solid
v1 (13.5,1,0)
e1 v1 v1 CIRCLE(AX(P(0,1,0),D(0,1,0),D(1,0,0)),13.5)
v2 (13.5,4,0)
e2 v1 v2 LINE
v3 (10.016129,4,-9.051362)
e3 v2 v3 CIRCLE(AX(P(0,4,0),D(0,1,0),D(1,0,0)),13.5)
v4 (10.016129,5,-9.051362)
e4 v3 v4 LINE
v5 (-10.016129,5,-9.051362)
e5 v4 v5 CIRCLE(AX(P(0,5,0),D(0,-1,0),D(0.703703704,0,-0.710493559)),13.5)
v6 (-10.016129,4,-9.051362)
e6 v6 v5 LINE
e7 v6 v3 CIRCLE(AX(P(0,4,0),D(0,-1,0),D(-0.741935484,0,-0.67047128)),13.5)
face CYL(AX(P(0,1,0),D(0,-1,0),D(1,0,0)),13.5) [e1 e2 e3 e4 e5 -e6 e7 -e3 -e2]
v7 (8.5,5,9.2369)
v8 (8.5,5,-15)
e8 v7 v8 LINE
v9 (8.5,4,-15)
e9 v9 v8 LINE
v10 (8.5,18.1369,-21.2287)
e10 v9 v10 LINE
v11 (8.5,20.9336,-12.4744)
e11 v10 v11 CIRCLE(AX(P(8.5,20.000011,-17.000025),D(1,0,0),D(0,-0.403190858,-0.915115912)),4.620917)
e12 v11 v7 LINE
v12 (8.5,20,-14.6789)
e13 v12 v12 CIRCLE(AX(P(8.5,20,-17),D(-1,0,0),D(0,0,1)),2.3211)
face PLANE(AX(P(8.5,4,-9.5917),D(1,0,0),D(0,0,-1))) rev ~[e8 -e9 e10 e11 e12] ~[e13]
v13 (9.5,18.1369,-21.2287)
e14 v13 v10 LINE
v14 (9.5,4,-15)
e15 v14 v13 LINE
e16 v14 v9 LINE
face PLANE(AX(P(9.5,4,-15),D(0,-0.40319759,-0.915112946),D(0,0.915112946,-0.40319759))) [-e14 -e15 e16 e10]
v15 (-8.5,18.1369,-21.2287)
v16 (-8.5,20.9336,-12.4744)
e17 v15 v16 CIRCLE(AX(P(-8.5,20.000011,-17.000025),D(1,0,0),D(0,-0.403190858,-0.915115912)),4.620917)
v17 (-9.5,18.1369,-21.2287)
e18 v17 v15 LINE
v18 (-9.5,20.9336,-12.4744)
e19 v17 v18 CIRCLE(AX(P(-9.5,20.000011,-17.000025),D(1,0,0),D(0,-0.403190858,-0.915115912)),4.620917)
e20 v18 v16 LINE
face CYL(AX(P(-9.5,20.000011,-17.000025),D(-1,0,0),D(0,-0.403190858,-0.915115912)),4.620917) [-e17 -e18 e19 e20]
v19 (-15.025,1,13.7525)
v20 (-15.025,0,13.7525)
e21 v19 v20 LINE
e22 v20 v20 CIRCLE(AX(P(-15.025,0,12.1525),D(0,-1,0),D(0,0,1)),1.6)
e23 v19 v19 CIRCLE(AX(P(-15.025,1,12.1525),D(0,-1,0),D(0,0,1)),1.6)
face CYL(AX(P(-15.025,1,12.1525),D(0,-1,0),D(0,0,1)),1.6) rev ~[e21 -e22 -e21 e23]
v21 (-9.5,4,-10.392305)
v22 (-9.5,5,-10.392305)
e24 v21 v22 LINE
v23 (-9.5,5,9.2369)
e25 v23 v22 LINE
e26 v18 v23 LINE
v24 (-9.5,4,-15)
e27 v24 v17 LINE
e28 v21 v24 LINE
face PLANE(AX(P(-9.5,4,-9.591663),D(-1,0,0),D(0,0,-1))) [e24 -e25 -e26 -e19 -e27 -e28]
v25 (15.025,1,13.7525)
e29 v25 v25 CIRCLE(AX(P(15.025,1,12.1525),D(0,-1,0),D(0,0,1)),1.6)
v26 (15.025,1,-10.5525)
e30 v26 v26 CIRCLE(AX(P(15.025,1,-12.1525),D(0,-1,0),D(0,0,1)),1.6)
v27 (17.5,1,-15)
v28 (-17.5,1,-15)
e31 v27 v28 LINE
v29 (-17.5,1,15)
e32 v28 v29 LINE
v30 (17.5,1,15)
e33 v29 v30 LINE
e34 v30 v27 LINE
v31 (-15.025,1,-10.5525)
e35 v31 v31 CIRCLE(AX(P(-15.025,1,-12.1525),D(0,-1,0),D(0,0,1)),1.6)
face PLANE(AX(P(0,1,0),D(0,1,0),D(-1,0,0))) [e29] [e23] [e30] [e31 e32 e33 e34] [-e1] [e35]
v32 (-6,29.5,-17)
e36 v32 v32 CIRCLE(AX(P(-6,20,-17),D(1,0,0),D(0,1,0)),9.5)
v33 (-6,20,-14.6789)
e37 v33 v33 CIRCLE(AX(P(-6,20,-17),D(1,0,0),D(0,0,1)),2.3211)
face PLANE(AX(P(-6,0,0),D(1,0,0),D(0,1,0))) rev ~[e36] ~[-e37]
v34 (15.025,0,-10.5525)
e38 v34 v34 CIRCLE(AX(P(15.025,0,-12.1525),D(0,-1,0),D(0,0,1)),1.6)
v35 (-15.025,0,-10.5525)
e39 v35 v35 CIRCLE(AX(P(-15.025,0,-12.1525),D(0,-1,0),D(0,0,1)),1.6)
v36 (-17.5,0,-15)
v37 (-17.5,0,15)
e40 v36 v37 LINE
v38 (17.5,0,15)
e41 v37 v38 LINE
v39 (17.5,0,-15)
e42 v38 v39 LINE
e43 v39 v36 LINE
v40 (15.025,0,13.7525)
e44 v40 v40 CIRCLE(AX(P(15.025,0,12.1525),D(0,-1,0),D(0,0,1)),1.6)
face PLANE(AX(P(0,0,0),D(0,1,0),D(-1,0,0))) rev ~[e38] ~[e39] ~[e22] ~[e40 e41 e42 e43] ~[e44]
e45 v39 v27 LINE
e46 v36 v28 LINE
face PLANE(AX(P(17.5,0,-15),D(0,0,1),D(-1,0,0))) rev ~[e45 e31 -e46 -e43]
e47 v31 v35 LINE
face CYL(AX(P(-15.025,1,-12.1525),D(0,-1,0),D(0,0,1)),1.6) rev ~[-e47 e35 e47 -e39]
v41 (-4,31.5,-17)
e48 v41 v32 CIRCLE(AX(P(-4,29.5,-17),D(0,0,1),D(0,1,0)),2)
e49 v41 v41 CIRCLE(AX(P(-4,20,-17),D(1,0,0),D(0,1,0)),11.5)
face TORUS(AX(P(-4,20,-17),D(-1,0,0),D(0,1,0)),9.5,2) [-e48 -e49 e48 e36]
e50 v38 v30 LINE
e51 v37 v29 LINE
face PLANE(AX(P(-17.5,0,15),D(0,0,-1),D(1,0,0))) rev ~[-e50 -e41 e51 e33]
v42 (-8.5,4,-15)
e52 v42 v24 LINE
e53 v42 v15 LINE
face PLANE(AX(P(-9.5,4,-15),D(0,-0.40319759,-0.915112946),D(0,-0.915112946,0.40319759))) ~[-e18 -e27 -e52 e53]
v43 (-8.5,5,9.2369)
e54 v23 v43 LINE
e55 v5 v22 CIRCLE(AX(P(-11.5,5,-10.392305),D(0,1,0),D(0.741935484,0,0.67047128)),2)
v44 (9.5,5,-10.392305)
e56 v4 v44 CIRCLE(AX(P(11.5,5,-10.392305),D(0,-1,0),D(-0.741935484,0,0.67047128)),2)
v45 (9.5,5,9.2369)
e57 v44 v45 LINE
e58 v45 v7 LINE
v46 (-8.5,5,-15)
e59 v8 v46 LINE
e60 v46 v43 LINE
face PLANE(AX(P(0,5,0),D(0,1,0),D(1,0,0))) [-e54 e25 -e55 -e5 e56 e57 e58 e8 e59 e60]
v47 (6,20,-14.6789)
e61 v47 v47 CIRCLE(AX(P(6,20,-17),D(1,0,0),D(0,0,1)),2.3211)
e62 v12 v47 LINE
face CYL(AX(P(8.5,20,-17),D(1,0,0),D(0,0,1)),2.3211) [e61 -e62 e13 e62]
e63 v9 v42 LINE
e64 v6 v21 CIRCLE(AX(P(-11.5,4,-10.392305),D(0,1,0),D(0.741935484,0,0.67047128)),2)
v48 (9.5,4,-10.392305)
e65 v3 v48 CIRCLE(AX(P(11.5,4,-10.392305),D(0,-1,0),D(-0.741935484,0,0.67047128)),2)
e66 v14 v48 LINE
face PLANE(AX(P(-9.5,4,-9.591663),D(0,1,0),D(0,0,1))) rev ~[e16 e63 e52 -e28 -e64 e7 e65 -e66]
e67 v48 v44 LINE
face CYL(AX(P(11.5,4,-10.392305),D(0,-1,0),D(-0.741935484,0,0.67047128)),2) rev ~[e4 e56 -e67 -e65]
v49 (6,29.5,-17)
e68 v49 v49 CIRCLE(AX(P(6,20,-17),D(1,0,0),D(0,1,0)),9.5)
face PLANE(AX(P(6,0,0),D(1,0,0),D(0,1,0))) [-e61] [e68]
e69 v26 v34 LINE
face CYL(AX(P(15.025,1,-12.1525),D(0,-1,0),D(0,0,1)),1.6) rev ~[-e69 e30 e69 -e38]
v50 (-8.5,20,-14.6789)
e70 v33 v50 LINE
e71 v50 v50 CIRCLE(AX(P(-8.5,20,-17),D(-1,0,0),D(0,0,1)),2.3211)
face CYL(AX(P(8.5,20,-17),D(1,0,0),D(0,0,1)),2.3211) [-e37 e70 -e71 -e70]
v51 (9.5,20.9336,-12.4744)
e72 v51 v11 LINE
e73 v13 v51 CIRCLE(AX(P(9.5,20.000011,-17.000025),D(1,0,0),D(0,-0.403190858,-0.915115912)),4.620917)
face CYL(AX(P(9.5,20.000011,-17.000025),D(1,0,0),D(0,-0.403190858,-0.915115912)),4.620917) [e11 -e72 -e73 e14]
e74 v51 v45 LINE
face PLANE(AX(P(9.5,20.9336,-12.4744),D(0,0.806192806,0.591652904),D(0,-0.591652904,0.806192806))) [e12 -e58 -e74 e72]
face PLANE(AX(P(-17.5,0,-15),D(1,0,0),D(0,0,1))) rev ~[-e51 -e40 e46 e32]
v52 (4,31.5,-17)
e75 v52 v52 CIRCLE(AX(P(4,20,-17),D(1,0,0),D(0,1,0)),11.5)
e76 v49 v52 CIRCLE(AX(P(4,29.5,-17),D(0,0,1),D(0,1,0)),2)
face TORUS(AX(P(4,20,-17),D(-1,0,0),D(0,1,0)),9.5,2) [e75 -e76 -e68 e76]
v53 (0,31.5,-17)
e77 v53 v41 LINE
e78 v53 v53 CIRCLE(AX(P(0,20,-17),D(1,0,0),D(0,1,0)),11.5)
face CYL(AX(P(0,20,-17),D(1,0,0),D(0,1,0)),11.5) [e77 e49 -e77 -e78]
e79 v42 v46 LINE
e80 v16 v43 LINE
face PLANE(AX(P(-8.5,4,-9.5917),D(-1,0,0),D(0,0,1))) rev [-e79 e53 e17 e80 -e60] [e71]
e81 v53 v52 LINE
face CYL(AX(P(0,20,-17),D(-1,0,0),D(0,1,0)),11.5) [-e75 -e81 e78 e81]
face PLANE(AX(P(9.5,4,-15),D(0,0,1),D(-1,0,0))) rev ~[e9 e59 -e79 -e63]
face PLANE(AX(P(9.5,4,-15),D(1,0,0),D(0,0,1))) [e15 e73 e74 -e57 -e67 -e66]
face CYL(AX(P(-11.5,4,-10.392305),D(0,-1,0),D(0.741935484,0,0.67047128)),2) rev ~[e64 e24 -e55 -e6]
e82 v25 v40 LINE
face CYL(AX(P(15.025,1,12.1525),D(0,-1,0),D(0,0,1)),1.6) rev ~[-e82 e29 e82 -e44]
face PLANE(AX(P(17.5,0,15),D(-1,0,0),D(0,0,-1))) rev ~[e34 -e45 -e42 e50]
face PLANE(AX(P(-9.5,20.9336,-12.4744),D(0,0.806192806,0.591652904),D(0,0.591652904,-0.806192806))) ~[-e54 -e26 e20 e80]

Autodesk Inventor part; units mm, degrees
ref_plane "YZ Plane" through (0, 0, 0) normal (1, 0, 0) x (0, 1, 0)
ref_plane "XZ Plane" through (0, 0, 0) normal (0, 1, 0) x (-1, 0, 0)
ref_plane "XY Plane" through (0, 0, 0) normal (0, 0, 1) x (1, 0, 0)
sketch "Sketch1" plane through (0, 0, 0) normal (0, 1, 0) x (-1, 0, 0)
  line L0 (17.5, 15) -> (-17.5, 15)
  line L1 (-17.5, 15) -> (-17.5, -15)
  line L2 (-17.5, -15) -> (17.5, -15)
  line L3 (17.5, -15) -> (17.5, 15)
  line L4 (17.5, 15) -> (-17.5, -15) construction
  line L5 (-17.5, 15) -> (17.5, -15) construction
  point P0 (0, 0)
  dimension "d0" = 35
  dimension "d1" = 30
extrude "Extrusion1" add sketch "Sketch1" along normal blind 1
sketch "Sketch2" plane through (0, 1, 0) normal (0, 1, 0) x (1, 0, 0)
  line L0 (-17.5, 15) -> (-17.5, -15) projected
  line L1 (-17.5, 0) -> (17.5, 0)
  line L2 (17.5, -15) -> (17.5, 15) projected
  line L3 (-17.5, -15) -> (17.5, -15) projected
  line L4 (0, -15) -> (0, 15)
  line L5 (17.5, 15) -> (-17.5, 15) projected
  point P0 (0, 0)
  point P1 (-15.025, -12.1525)
  point P2 (-15.025, 12.1525)
  point P3 (15.025, -12.1525)
  point P4 (15.025, 12.1525)
  dimension "d11" = 15.025
  dimension "d12" = 12.1525
hole "Hole1" at (-15.025, 1, 12.1525) at (-15.025, 1, -12.1525) at (15.025, 1, -12.1525) at (15.025, 1, 12.1525) direction (0, -1, 0) diameter 3.2 end through all clearance for "Countersunk Flat Head Screw DIN EN ISO 2009" size "M3" standard "DIN"
sketch "Sketch3" plane through (0, 1, 0) normal (0, 1, 0) x (1, 0, 0)
  circle A0 centre (0, 0) radius 13.5
  dimension "d13" = 27
extrude "Extrusion2" add sketch "Sketch3" along normal blind 3
sketch "Sketch4" plane through (0, 4, 0) normal (0, 1, 0) x (1, 0, 0)
  circle A0 centre (0, 0) radius 13.5 projected
  line L0 (17.5, 15) -> (-17.5, 15) projected
  line L1 (-9.5, 15) -> (9.5, 15)
  line L2 (9.5, 15) -> (9.5, 8)
  line L3 (9.5, 8) -> (-9.5, 8)
  line L4 (-9.5, 8) -> (-9.5, 15)
  line L5 (-9.5, 15) -> (9.5, 8) construction
  line L6 (9.5, 15) -> (-9.5, 8) construction
  point P0 (0, 11.5)
  point P1 (0, 8)
  point P2 (-9.5, 9.5917)
  point P3 (9.5, 9.5917)
  dimension "d16" = 19
  dimension "d17" = 7
extrude "Extrusion3" add sketch "Sketch4" along normal blind 1
sketch "Sketch5" plane through (9.5, 4, -9.5917) normal (1, 0, 0) x (0, 0, -1)
  line L0 (0, 0) -> (5.4083, 0) projected
  line L1 (5.4083, 0) -> (11.637, 14.1369)
  arc A0 (11.637, 14.1369) -> (2.8827, 16.9336) centre (7.4083, 16) ccw
  line L2 (2.8827, 16.9336) -> (0, 0)
  line L3 (2.8827, 16.9336) -> (-18.8286, 1)
  line L4 (0, 1) -> (-23.0917, 1) projected
  line L5 (0, 1) -> (1.0062, 1)
  line L6 (5.4083, 1) -> (0, 1) projected
  point P0 (-9.5917, -4)
  point P1 (0.1702, 1)
  dimension "d20" = 16
  dimension "d31" = 2
extrude "Extrusion4" add sketch "Sketch5" against normal blind 1
mirror "Mirror1" about plane through (0, 0, 0) normal (1, 0, 0) of "Extrusion4"
fillet "Fillet2" radius 2 2 edges at (-9.5, 4.5, -9.5917) (9.5, 4.5, -9.5917)
sketch "Sketch6" plane through (0, 0, 0) normal (1, 0, 0) x (0, 1, 0)
  arc A0 (18.1369, -21.2287) -> (20.9336, -12.4744) centre (20, -17) ccw projected
  circle A1 centre (20, -17) radius 11.5
  point P0 (0, 0)
  dimension "d25" = 23
extrude "Extrusion5" add sketch "Sketch6" along normal mid plane 12
sketch "Sketch7" plane through (8.5, 4, -9.5917) normal (-1, 0, 0) x (0, 0, 1)
  arc A0 (-2.8827, 16.9336) -> (-11.637, 14.1369) centre (-7.4083, 16) ccw projected
  circle A1 centre (-7.4083, 16) radius 2.3211
  point P0 (9.5917, -4)
extrude "Extrusion6" add sketch "Sketch7" along normal up to surface (17 mm away)
fillet "Fillet3" radius 2 2 edges at (6, 8.5, -17) (-6, 8.5, -17)
properties part number "rearaxle" material "Stainless Steel AISI 440C, Welded"
